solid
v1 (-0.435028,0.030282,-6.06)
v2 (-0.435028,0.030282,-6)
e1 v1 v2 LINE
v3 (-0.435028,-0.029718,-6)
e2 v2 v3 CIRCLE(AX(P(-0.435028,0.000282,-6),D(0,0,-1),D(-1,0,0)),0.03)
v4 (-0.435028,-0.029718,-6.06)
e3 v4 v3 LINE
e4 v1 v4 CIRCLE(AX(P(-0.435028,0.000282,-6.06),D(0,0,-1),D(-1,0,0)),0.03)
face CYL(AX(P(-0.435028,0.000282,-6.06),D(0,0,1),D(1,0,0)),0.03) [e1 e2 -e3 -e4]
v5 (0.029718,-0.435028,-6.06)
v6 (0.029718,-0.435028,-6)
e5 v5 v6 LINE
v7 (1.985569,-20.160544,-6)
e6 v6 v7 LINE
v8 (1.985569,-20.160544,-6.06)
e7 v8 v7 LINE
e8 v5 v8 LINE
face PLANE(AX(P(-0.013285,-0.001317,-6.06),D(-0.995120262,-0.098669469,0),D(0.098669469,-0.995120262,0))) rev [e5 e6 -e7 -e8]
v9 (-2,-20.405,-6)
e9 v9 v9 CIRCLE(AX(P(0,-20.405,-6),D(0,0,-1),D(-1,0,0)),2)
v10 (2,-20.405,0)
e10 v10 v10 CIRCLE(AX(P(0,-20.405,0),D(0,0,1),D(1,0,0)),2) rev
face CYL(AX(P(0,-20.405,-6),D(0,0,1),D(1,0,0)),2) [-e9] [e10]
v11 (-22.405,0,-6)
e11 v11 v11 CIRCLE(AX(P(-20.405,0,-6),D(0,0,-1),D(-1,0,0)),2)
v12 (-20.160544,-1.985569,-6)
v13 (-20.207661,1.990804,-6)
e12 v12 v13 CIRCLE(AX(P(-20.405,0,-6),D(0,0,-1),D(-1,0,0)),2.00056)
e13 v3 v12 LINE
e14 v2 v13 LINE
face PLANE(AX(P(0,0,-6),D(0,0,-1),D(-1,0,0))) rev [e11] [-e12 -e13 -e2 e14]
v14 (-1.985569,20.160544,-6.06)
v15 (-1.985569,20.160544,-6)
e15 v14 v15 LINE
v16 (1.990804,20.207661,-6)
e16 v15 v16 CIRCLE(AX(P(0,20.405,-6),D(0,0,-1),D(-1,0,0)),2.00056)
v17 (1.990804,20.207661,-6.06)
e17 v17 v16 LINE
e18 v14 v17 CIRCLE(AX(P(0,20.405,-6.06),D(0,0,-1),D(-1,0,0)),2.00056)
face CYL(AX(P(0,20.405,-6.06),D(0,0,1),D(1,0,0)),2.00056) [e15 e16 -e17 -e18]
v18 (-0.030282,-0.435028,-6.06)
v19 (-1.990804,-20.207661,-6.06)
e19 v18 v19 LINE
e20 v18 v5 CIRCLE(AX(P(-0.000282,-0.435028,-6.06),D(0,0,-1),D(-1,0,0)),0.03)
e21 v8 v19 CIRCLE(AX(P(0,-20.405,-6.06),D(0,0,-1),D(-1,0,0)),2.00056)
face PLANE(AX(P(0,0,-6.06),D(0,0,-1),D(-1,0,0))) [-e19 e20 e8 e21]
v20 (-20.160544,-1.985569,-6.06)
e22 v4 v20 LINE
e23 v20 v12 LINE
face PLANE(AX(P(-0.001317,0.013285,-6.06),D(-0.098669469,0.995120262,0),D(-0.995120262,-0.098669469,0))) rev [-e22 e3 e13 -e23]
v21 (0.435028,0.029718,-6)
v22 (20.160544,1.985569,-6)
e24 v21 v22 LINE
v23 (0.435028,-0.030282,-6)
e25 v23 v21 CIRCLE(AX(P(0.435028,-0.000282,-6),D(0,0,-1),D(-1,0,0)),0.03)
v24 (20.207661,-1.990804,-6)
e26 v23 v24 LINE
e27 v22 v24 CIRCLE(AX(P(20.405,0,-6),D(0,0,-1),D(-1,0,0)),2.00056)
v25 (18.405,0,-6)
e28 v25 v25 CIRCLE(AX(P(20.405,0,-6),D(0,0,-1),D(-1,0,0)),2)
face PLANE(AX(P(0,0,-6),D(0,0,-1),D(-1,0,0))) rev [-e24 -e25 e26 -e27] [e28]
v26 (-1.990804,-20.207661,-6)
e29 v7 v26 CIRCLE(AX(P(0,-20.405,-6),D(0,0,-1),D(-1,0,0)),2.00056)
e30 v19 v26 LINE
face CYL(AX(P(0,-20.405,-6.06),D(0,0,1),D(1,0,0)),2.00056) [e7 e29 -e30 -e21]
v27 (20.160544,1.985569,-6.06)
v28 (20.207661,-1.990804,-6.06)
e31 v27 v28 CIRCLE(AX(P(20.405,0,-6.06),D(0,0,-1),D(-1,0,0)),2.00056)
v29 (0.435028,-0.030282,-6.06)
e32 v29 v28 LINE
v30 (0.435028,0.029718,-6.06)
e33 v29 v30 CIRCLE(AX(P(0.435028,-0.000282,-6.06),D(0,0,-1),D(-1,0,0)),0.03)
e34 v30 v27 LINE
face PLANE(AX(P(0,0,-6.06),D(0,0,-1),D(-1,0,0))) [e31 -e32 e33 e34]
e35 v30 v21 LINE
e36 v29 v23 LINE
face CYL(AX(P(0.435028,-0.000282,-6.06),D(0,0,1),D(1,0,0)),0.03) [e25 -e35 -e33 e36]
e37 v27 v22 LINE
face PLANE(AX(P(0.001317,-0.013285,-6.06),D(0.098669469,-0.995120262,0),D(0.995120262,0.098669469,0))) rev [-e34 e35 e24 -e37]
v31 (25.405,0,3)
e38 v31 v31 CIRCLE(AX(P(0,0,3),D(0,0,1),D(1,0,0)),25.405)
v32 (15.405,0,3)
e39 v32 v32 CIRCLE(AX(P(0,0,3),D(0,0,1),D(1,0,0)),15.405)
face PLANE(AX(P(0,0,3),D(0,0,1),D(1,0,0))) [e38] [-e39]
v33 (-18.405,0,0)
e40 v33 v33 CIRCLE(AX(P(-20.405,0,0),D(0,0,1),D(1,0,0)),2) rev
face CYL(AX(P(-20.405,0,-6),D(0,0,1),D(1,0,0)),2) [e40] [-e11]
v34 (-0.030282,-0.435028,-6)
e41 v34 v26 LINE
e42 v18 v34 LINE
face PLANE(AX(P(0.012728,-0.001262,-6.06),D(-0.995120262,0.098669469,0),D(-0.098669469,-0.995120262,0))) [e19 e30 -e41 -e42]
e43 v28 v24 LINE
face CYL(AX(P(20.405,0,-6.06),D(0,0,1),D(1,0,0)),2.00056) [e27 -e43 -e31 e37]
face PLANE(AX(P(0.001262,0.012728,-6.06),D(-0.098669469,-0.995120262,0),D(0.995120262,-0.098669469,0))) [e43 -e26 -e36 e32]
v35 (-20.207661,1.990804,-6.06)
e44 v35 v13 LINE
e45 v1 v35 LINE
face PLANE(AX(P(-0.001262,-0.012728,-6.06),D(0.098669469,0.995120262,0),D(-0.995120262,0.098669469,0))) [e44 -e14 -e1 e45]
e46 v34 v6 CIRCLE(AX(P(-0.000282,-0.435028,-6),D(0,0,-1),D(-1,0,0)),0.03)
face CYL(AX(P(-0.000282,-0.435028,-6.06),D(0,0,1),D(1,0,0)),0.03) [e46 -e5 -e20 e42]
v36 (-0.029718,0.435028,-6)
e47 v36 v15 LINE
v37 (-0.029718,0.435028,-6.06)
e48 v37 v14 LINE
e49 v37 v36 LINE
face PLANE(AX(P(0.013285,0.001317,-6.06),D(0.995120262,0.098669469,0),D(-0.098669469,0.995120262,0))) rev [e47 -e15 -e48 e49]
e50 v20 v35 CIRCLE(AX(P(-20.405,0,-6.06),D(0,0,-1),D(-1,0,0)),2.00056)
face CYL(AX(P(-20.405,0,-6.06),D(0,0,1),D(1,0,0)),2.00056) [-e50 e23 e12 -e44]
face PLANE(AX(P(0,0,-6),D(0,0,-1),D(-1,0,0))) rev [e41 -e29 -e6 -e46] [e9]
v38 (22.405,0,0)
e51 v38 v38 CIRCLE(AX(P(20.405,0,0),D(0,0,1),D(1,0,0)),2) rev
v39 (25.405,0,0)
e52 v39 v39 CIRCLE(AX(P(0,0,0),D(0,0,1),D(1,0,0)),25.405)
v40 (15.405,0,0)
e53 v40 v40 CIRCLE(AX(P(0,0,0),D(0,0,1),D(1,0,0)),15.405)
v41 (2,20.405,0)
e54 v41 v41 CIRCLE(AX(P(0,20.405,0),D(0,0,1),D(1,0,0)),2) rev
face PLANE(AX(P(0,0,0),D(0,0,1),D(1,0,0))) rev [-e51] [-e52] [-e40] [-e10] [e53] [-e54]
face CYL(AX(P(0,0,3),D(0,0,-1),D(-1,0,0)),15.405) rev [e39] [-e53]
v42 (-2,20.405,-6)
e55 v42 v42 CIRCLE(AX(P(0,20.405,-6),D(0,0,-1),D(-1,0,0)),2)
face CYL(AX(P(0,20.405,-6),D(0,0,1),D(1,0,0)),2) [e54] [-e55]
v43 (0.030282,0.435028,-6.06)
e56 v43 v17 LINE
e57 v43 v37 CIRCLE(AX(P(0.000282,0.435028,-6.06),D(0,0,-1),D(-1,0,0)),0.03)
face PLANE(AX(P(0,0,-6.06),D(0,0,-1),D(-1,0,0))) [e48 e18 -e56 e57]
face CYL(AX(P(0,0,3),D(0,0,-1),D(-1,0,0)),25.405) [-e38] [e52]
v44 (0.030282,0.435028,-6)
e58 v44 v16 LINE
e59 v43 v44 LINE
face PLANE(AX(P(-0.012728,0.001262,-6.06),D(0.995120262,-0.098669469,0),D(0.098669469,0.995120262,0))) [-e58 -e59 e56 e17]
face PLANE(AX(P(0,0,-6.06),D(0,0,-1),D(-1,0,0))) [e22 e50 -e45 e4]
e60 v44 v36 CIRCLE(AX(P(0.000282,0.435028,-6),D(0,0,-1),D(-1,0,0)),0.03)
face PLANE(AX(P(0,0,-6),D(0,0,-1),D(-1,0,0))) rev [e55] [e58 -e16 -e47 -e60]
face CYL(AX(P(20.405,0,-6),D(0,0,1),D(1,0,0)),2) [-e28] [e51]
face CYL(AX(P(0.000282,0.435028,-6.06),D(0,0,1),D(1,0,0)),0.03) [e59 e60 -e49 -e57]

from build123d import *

# Parameters (mm, degrees)
SKETCH_1_R      = 25.405
SKETCH_1_R_2    = 15.405
EXTRUDE_3_DEPTH = 3
SKETCH_4_R      = 2
EXTRUDE_4_DEPTH = 6
EXTRUDE_7_DEPTH = 0.06


# Read off the part's stored shape, not the designer's step: 填料-伸長7
with BuildPart() as part:
    # 草圖1 → 填料-伸長3 (new body)
    with BuildSketch(Plane.XY):
        Circle(SKETCH_1_R)
        Circle(SKETCH_1_R_2, mode=Mode.SUBTRACT)
    extrude(amount=EXTRUDE_3_DEPTH)

    # 草圖4 → 填料-伸長4 (add)
    with BuildSketch(Plane(origin=(0, 0, 0), x_dir=(-1, 0, 0), z_dir=(0, 0, -1))):
        with Locations(Location((20.405, 0, 0), (0, 0, 180))):
            Circle(SKETCH_4_R)
        with Locations(Location((0, 20.405, 0), (0, 0, 180))):
            Circle(SKETCH_4_R)
        with Locations(Location((-20.405, 0, 0), (0, 0, 180))):
            Circle(SKETCH_4_R)
        with Locations(Location((0, -20.405, 0), (0, 0, 180))):
            Circle(SKETCH_4_R)
    extrude(amount=EXTRUDE_4_DEPTH)

    # 填料-伸長7 outline → 填料-伸長7 (add)
    with BuildSketch(Plane(origin=(0, 0, -6), x_dir=(-1, 0, 0), z_dir=(0, 0, -1))):
        with BuildLine():
            Line((-0.435027571, 0.029718439), (-20.160544311, 1.985568742))
            ThreePointArc((-20.160544311, 1.985568742), (-22.405419947, 0.023703335), (-20.207661062, -1.990803646))
            Line((-20.207661062, -1.990803646), (-0.435027571, -0.030281561))
            ThreePointArc((-0.435027571, -0.030281561), (-0.405027571, -0.000281561), (-0.435027571, 0.029718439))
        make_face()
        with BuildLine():
            ThreePointArc((1.985568742, 20.160544311), (0.023703335, 22.405419947), (-1.990803646, 20.207661062))
            Line((-1.990803646, 20.207661062), (-0.030281561, 0.435027571))
            ThreePointArc((-0.030281561, 0.435027571), (-0.000281561, 0.405027571), (0.029718439, 0.435027571))
            Line((0.029718439, 0.435027571), (1.985568742, 20.160544311))
        make_face()
        with BuildLine():
            ThreePointArc((20.160544311, -1.985568742), (22.405419947, -0.023703335), (20.207661062, 1.990803646))
            Line((20.207661062, 1.990803646), (0.435027571, 0.030281561))
            ThreePointArc((0.435027571, 0.030281561), (0.405027571, 0.000281561), (0.435027571, -0.029718439))
            Line((0.435027571, -0.029718439), (20.160544311, -1.985568742))
        make_face()
        with BuildLine():
            ThreePointArc((-1.985568742, -20.160544311), (-0.023703335, -22.405419947), (1.990803646, -20.207661062))
            Line((1.990803646, -20.207661062), (0.030281561, -0.435027571))
            ThreePointArc((0.030281561, -0.435027571), (0.000281561, -0.405027571), (-0.029718439, -0.435027571))
            Line((-0.029718439, -0.435027571), (-1.985568742, -20.160544311))
        make_face()
    extrude(amount=EXTRUDE_7_DEPTH)


solid = part.part
